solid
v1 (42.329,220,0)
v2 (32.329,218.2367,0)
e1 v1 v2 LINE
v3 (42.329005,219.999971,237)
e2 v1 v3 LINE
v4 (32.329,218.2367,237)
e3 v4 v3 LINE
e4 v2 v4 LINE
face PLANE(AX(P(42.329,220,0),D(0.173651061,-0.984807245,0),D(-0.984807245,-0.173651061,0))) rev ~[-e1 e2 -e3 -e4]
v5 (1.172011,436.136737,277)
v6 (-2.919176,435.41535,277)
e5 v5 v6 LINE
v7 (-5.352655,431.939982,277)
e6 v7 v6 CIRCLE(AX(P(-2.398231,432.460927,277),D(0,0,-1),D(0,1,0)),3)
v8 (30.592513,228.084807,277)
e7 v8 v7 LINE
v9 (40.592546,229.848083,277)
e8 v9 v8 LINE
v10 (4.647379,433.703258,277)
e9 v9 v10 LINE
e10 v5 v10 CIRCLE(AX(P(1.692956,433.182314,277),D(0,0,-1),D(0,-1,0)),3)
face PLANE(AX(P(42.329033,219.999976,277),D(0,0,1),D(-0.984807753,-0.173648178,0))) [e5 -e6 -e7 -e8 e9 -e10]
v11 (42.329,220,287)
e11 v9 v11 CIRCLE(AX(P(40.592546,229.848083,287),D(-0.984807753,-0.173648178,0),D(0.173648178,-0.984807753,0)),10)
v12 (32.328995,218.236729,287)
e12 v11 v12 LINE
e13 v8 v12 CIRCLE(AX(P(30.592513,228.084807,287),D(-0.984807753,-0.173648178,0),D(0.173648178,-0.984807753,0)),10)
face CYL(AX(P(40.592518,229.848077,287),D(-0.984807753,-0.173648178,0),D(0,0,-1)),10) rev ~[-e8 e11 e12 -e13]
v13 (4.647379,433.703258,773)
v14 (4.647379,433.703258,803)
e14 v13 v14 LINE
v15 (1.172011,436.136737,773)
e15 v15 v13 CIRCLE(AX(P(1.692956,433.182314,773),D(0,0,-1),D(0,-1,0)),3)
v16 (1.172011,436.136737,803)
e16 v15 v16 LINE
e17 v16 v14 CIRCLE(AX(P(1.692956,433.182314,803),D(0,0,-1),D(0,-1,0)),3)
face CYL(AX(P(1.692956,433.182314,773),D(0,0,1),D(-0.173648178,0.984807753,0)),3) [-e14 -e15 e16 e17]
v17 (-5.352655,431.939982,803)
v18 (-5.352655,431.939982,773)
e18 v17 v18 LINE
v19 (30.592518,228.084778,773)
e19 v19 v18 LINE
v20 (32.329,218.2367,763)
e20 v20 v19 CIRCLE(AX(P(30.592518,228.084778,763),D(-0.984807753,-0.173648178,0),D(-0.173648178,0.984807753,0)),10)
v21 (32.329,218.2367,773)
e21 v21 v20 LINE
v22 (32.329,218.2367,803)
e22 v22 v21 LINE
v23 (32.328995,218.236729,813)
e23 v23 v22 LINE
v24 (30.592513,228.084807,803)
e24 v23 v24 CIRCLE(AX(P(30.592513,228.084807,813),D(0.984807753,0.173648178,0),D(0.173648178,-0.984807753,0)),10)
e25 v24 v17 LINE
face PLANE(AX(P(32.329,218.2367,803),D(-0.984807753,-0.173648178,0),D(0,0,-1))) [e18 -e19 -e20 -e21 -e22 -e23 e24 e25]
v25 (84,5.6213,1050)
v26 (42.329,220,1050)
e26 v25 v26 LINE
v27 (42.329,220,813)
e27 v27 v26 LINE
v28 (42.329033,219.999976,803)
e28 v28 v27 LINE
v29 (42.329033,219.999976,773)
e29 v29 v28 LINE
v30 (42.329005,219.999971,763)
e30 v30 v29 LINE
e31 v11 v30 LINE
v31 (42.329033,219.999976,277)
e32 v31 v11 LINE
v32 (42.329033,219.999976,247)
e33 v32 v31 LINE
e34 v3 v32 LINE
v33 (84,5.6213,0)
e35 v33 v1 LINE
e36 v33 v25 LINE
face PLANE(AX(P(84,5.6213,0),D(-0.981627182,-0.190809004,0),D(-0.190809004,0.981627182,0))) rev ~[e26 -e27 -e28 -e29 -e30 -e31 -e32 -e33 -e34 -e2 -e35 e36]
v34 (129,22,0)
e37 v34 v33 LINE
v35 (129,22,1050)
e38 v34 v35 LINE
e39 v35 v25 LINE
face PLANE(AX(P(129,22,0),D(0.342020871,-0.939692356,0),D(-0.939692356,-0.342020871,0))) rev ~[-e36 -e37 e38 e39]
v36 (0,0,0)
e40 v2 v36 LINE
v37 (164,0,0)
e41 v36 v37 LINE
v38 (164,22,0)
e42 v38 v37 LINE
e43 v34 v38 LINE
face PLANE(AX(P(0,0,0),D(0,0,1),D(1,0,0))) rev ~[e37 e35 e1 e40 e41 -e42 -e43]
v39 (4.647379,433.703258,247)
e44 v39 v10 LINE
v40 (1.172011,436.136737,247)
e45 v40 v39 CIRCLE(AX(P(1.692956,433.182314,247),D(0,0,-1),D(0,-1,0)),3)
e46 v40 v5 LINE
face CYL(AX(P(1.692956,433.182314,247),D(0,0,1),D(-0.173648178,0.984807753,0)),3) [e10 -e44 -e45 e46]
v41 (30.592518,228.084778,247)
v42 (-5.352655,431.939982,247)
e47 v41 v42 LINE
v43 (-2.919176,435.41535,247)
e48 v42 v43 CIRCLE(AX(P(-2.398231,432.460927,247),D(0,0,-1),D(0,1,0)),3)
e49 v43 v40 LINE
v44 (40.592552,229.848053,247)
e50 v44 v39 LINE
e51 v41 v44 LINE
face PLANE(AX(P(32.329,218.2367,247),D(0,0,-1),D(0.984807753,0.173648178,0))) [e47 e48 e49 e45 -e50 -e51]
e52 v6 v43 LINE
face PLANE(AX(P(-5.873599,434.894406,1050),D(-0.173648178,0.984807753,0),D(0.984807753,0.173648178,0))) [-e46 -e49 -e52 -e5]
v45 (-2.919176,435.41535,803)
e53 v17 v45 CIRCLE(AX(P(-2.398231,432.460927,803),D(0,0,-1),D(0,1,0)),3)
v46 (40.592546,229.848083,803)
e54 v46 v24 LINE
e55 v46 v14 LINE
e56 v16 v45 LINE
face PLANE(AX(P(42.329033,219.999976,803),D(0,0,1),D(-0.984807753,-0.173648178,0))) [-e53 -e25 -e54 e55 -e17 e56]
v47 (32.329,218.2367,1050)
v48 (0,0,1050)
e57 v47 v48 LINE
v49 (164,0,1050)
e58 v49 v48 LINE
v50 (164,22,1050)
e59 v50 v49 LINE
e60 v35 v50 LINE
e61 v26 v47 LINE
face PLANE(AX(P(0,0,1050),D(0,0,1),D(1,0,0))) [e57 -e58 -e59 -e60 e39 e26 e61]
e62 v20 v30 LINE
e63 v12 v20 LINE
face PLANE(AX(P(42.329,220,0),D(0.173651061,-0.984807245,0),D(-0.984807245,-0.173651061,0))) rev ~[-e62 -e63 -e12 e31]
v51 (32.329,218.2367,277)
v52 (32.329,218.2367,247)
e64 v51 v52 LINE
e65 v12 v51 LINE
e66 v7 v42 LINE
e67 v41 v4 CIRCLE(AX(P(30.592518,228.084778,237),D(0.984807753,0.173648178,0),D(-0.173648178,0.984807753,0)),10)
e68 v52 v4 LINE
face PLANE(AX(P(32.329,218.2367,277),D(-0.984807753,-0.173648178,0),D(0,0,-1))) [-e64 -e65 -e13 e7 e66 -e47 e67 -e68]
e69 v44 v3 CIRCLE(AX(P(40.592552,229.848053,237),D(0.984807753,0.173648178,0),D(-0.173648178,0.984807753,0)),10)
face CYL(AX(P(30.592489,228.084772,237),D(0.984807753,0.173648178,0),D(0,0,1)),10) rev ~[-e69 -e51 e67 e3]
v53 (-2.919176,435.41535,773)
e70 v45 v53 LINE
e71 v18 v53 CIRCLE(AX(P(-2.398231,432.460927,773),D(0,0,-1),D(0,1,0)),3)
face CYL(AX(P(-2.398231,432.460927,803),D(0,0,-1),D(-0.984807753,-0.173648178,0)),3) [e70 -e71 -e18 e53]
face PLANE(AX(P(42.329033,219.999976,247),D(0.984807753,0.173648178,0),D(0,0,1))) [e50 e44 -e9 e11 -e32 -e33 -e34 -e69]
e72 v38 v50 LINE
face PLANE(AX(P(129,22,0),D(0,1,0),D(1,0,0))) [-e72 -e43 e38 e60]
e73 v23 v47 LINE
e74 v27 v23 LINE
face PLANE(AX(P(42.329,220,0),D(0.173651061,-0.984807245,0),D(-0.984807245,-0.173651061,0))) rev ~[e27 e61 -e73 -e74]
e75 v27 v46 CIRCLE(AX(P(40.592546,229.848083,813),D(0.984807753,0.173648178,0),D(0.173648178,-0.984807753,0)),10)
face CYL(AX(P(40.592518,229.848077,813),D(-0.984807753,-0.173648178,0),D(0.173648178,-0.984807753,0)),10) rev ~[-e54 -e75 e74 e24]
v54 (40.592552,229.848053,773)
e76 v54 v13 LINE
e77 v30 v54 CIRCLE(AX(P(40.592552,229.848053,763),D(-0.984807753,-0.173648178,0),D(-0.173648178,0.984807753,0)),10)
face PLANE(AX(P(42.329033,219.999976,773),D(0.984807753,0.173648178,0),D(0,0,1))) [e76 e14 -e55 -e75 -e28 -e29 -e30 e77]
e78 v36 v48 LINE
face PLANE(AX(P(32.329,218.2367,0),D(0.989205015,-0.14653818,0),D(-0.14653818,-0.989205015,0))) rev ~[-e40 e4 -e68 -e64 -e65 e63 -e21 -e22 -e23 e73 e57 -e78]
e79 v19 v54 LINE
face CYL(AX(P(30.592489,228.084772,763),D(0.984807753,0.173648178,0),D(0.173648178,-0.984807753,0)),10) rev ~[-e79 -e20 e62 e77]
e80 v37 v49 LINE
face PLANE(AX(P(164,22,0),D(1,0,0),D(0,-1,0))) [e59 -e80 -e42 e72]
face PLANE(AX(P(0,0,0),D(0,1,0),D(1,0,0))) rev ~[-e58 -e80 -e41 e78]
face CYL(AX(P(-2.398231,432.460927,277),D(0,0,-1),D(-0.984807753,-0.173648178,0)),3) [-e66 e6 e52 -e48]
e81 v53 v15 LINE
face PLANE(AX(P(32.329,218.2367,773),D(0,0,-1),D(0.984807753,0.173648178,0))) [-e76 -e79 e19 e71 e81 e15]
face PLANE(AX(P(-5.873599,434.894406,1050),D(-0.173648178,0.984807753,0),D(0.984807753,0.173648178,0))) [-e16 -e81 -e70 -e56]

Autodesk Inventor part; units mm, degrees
ref_plane "YZ Plane" through (0, 0, 0) normal (1, 0, 0) x (0, 1, 0)
ref_plane "XZ Plane" through (0, 0, 0) normal (0, 1, 0) x (-1, 0, 0)
ref_plane "XY Plane" through (0, 0, 0) normal (0, 0, 1) x (1, 0, 0)
sketch "Sketch1" plane through (0, 0, 0) normal (0, 0, 1) x (1, 0, 0)
  line L0 (0, 0) -> (132, 0)
  line L1 (42.329, 220) -> (32.329, 218.2367)
  line L2 (32.329, 218.2367) -> (0, 0)
  line L3 (129, 22) -> (84, 5.6213)
  line L4 (84, 5.6213) -> (114.3391, 5.6213) construction
  line L5 (84, 5.6213) -> (42.329, 220)
  line L6 (132, 0) -> (129, 22)
  line L7 (129, 22) -> (164, 22)
  line L8 (164, 22) -> (164, 0)
  line L9 (164, 0) -> (132, 0)
  dimension "d0" = 132
  dimension "d1" = 220
  dimension "d6" = 20
  dimension "d7" = 81
  dimension "d8" = 10
  dimension "d9" = 10
  dimension "d22" = 45
  dimension "d23" = 22
  dimension "d24" = 3
extrude "Extrusion1" add sketch "Sketch1" along normal blind 1050
sketch "Sketch2" plane through (32.329, 218.2367, 1050) normal (-0.1736482, 0.9848078, 0) x (0.9848078, 0.1736482, 0)
  line L0 (0, 277) -> (10.1543, 277)
  line L1 (10.1543, 277) -> (10.1543, 247)
  line L2 (10.1543, 247) -> (0, 247)
  line L3 (0, 247) -> (0, 277)
  line L4 (0, 1050) -> (0, 0) construction
  line L5 (0, 803) -> (10.1543, 803)
  line L6 (10.1543, 803) -> (10.1543, 773)
  line L7 (10.1543, 773) -> (0, 773)
  line L8 (0, 773) -> (0, 803)
  line L9 (13.9657, 1050) -> (0, 1050) construction
  line L10 (10.1543, 1050) -> (10.1543, 0) construction
  point P0 (-69.7343, 1050)
  dimension "d12" = 30
  dimension "d13" = 30
  dimension "d14" = 247
  dimension "d15" = 247
extrude "Extrusion2" add sketch "Sketch2" along normal blind 220
fillet "Fillet1" radius 3 4 edges at (4.1264, 436.6577, 788) (-5.8736, 434.8944, 788) (4.1264, 436.6577, 262) (-5.8736, 434.8944, 262)
fillet "Fillet2" radius 10 4 edges at (37.329, 219.1184, 803) (37.329, 219.1184, 277) (37.329, 219.1184, 773) (37.329, 219.1184, 247)
properties part number "sostenedor1"
